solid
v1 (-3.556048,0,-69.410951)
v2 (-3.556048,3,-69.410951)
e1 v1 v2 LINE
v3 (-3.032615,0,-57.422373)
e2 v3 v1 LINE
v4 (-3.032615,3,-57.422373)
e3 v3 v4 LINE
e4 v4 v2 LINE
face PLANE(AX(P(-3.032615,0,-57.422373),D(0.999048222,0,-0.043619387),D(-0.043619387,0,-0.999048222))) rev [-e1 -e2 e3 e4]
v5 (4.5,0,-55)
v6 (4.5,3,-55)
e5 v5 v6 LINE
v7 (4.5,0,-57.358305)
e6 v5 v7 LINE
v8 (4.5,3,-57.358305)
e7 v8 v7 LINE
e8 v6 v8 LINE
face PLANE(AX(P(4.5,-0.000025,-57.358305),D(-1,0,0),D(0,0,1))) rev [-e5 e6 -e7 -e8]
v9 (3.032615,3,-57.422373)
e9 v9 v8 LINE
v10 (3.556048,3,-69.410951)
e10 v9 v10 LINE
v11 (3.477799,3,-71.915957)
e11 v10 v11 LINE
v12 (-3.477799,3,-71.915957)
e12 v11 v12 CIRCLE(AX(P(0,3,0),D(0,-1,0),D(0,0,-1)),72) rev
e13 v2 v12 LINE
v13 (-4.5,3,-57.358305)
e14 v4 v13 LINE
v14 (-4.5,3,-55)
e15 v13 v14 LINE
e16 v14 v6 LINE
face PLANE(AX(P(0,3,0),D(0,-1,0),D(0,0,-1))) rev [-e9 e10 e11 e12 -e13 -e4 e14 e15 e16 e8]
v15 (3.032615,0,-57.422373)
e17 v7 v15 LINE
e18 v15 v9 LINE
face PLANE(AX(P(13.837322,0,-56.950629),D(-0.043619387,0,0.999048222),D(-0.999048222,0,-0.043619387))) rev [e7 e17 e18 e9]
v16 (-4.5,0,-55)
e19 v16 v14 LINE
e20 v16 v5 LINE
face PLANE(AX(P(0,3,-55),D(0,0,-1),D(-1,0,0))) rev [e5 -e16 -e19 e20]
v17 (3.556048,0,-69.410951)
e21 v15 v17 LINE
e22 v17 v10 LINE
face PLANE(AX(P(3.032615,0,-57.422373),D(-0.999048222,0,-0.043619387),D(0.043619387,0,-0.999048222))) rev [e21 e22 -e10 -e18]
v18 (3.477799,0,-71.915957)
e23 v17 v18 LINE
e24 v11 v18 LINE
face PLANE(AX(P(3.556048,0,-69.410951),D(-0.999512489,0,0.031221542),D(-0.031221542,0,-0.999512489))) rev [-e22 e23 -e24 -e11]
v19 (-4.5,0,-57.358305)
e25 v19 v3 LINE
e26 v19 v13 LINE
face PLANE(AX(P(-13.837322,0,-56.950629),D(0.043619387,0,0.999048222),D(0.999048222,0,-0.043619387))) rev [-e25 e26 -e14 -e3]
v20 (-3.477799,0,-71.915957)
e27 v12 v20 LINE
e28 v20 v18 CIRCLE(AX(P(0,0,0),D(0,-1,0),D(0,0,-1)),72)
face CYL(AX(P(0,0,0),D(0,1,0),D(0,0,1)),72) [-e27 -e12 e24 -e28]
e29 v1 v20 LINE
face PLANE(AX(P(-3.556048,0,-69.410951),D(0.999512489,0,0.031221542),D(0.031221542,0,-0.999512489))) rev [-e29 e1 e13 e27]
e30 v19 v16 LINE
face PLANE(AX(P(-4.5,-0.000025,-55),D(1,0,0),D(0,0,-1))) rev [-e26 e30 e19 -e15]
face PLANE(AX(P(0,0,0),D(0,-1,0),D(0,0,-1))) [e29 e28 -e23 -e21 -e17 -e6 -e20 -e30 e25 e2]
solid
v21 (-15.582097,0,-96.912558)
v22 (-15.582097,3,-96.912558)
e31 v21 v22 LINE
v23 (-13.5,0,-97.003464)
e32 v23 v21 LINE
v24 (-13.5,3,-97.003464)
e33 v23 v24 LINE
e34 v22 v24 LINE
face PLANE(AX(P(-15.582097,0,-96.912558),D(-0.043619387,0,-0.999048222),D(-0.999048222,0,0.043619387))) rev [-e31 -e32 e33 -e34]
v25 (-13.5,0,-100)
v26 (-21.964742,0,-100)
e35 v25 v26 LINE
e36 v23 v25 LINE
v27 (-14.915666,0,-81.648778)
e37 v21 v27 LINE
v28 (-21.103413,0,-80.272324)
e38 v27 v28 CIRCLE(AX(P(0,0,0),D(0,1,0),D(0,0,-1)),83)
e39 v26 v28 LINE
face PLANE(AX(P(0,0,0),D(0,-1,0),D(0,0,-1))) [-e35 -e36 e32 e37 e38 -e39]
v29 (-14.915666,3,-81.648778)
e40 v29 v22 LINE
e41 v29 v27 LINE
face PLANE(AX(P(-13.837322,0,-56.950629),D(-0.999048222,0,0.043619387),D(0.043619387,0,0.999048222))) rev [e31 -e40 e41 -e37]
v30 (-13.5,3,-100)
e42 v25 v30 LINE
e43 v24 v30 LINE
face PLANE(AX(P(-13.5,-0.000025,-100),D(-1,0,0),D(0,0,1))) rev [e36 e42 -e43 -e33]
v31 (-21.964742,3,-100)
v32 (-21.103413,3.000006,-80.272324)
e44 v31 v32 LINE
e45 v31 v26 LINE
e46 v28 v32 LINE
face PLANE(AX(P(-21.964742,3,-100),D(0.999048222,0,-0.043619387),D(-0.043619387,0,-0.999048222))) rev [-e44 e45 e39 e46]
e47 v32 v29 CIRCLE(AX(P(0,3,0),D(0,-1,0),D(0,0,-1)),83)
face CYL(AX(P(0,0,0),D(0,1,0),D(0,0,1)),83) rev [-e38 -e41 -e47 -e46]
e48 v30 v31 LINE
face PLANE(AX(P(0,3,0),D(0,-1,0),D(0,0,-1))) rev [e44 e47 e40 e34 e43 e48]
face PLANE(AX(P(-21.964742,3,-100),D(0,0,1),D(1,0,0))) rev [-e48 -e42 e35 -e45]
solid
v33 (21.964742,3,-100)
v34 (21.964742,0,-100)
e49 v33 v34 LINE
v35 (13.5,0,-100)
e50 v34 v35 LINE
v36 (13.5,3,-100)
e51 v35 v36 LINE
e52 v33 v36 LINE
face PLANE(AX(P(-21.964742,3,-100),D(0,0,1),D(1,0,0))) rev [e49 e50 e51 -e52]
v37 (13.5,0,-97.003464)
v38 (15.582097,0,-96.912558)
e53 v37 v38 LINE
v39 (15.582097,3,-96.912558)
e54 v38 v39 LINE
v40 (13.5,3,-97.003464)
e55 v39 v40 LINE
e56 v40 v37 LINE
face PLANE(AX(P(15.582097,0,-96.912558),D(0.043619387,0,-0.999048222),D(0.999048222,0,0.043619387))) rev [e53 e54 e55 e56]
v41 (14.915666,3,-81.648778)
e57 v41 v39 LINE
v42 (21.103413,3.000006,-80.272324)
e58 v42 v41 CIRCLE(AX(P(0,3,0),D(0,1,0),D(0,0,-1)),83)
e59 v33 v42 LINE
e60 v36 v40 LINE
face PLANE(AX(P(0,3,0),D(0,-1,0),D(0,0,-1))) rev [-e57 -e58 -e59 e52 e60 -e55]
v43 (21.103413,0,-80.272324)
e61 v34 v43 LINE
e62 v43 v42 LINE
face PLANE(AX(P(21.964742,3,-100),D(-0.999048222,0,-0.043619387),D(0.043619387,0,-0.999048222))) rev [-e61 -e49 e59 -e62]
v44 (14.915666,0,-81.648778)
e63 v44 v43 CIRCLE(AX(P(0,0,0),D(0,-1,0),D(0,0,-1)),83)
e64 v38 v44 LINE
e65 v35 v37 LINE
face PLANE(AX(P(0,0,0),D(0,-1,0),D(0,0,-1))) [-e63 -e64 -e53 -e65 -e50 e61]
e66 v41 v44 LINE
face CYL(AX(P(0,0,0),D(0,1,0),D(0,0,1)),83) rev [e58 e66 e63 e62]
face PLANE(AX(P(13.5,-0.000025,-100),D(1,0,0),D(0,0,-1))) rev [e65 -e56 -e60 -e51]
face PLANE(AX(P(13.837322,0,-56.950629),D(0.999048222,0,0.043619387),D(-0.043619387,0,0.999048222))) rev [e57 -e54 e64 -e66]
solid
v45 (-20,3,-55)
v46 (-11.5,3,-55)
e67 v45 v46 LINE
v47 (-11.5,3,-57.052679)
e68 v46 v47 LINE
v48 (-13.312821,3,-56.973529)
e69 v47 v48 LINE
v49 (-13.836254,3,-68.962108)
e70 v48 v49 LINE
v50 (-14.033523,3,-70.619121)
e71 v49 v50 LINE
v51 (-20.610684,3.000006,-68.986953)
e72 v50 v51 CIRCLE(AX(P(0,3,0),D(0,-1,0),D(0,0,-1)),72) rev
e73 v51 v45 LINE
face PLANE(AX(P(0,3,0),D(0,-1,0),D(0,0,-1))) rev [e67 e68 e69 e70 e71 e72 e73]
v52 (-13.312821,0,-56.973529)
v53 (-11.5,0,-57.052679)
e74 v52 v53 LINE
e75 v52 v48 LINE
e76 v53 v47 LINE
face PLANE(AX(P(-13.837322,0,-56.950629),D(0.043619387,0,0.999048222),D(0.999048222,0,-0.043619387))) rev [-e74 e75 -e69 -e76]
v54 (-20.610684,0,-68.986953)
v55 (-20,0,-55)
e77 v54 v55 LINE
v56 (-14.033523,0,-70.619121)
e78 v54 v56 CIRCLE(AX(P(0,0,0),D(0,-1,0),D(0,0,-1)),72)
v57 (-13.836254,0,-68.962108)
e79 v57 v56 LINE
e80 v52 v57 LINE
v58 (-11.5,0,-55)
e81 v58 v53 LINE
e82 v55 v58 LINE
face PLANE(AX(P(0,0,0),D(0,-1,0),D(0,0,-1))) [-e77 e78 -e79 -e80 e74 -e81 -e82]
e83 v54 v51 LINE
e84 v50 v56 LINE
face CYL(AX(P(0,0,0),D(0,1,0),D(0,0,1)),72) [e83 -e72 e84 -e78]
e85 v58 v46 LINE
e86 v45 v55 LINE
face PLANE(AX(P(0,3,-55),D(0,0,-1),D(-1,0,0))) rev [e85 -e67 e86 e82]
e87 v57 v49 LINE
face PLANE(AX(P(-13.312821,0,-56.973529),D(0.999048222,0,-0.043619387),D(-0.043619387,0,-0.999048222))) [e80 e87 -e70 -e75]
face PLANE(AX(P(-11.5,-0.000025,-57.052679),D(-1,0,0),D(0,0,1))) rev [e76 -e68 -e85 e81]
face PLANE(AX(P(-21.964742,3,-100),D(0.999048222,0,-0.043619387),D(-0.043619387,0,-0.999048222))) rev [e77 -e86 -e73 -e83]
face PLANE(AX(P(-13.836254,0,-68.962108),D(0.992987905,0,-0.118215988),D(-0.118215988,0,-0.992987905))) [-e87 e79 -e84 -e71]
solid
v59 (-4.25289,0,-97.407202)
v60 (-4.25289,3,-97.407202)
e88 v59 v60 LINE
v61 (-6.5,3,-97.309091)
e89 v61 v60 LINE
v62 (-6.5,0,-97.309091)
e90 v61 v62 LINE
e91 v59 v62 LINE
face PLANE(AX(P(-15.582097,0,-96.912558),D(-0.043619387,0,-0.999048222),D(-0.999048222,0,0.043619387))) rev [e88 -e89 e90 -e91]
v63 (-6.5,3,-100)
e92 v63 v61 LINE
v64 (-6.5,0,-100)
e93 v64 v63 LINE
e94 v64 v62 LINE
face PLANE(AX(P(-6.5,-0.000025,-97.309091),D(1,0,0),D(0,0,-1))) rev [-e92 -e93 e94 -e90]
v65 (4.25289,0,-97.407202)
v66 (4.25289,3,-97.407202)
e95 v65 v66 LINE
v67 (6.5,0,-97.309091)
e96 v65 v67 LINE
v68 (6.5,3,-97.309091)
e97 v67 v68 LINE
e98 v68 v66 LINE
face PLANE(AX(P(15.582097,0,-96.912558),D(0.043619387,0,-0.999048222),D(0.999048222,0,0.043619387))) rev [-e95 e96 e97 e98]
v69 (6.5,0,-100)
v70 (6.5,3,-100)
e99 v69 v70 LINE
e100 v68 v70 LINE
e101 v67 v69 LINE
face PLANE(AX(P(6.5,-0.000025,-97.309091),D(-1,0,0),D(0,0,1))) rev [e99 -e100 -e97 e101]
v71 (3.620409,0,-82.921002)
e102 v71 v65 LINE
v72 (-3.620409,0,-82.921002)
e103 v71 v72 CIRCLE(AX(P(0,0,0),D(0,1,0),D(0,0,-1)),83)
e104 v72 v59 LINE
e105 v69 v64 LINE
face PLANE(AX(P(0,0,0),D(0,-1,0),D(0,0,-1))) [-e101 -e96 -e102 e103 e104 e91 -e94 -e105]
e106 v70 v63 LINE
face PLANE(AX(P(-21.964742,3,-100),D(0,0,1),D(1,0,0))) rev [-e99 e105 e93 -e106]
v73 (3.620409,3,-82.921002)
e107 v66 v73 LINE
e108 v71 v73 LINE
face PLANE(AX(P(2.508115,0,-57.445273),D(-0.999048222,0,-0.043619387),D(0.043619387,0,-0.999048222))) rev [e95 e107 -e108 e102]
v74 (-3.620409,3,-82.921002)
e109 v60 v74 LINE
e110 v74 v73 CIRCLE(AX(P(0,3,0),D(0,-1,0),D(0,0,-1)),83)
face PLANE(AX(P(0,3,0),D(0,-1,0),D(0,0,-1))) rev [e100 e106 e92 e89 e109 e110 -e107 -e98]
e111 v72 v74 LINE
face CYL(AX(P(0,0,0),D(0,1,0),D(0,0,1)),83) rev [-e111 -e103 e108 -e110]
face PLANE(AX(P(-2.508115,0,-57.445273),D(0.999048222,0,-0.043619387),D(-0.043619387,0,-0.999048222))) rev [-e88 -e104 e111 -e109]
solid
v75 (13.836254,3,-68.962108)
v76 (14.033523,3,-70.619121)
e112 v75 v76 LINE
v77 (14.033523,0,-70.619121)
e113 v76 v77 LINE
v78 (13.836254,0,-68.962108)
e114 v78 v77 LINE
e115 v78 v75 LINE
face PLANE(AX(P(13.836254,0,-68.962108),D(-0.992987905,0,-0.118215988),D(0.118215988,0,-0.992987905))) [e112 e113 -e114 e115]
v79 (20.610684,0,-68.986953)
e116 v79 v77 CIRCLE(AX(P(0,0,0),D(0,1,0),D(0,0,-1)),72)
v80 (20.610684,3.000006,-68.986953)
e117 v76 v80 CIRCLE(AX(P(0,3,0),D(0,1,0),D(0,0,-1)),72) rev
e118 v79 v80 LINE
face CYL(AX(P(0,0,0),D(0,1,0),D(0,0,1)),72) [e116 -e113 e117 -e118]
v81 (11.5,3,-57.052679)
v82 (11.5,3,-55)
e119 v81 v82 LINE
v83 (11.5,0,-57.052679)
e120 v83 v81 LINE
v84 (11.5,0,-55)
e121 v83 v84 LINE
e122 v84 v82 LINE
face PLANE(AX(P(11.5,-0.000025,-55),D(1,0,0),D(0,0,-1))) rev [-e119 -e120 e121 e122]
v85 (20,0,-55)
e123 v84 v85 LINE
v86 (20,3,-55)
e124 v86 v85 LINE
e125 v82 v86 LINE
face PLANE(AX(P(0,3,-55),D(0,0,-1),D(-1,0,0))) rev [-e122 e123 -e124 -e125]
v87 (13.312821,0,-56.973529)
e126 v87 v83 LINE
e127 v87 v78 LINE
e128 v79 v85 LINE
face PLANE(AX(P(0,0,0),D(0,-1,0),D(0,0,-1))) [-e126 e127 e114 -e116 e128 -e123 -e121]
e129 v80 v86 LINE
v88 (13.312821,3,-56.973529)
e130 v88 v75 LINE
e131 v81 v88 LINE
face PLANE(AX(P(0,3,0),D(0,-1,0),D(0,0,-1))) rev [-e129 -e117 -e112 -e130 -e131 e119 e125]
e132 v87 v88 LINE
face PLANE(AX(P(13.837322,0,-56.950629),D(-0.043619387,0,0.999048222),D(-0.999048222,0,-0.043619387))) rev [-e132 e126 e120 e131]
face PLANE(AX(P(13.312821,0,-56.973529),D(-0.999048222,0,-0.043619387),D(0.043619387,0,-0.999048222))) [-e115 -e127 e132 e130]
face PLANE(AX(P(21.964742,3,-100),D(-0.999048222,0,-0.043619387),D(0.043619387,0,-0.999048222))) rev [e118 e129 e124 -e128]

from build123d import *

# Parameters (mm, degrees)
BOSS_EXTRUDE1_DEPTH      = 3
CUT_EXTRUDE1_DEPTH       = 103.427778996
BOSS_EXTRUDE2_DEPTH      = 3
CUT_EXTRUDE5_DEPTH       = 103.427778996
MIRROR4_DEPTH            = 3
CUT_EXTRUDE7_DEPTH       = 103.427778996
CUT_EXTRUDE7_DEPTH_BACK  = 103.427778996
CUT_EXTRUDE8_DEPTH       = 103.427778996
CUT_EXTRUDE8_DEPTH_BACK  = 103.427778996
CUT_EXTRUDE9_DEPTH       = 103.427778996
CUT_EXTRUDE9_DEPTH_BACK  = 103.427778996
CUT_EXTRUDE10_DEPTH      = 103.427778996
CUT_EXTRUDE10_DEPTH_BACK = 103.427778996


# Read off the part's stored shape, not the designer's step: Mirror4
with BuildPart() as part:
    # Sketch1 → Boss-Extrude1 (new body)
    with BuildSketch(Plane(origin=(0, 0, 0), x_dir=(1, 0, 0), z_dir=(0, 1, 0))):
        Polygon((-21.964742431, 100), (-20, 55), (0, 55), (0, 100), align=None)
    extrude(amount=BOSS_EXTRUDE1_DEPTH)

    # Sketch2 → Cut-Extrude1 (cut, symmetric)
    with BuildSketch(Plane(origin=(0, 3, 0), x_dir=(1, 0, 0), z_dir=(0, 1, 0))):
        Polygon((-13.837321606, 56.950628888), (-2.508114774, 57.445272741), (-4.252890268, 97.407201604), (-15.582097101, 96.912557752), align=None)
    extrude(amount=CUT_EXTRUDE1_DEPTH, both=True, mode=Mode.SUBTRACT)

    # Sketch6 → Boss-Extrude2 (add)
    with BuildSketch(Plane(origin=(0, 3, 0), x_dir=(1, 0, 0), z_dir=(0, 1, 0))):
        Polygon((-13.837321606, 56.950628888), (-13.31282129, 56.973529067), (-13.836253938, 68.962107726), (-14.666089966, 75.932545098), align=None)
    boss_extrude2 = extrude(amount=-BOSS_EXTRUDE2_DEPTH)

    # Mirror3: Boss-Extrude2 across plane
    add(boss_extrude2.mirror(Plane(origin=(-5.664603416, 0, 0.247321926), x_dir=(0.043619387365336264, 0, 0.9990482215818577), z_dir=(0.9990482215818578, 0, -0.043619387365336264))))

    # Sketch11 → Cut-Extrude5 (cut, symmetric)
    with BuildSketch(Plane(origin=(0, 3, 0), x_dir=(1, 0, 0), z_dir=(0, 1, 0))):
        with BuildLine():
            Line((-21.103413479, 80.272323621), (-20.610683569, 68.98695328))
            ThreePointArc((-20.610683569, 68.98695328), (-10.414877912, 71.24275625), (0, 72))
            Line((0, 72), (0, 83))
            ThreePointArc((0, 83), (-10.639481647, 82.315256364), (-21.103413479, 80.272323621))
        make_face()
    extrude(amount=CUT_EXTRUDE5_DEPTH, both=True, mode=Mode.SUBTRACT)


with BuildPart() as cut_extrude5_piece_1:
    # of the separate pieces the step leaves, piece 1, a body of its own (cut_extrude5_pieces)
    add(part.part.solids().sort_by_distance((-21.964742431, 0, -100))[0])



with BuildPart() as cut_extrude5_piece_2:
    # of the separate pieces the step leaves, piece 2, a body of its own (cut_extrude5_pieces)
    add(part.part.solids().sort_by_distance((-20.610683569, 0, -68.98695328))[0])


with BuildPart() as cut_extrude5_piece_1_1:
    add(cut_extrude5_piece_1.part)

    add(cut_extrude5_piece_2.part)  # Mirror4 merges Cut-Extrude5 piece 2
    # Mirror4 outline → Mirror4 (add)
    with BuildSketch(Plane(origin=(0, 0, 0), x_dir=(1, 0, 0), z_dir=(0, 1, 0))):
        with BuildLine():
            Line((21.964742431, 100), (0, 100))
            Line((0, 100), (0, 83))
            ThreePointArc((0, 83), (1.810635458, 82.980248248), (3.620409151, 82.921002391))
            Line((3.620409151, 82.921002391), (4.252890268, 97.407201604))
            Line((4.252890268, 97.407201604), (15.582097101, 96.912557752))
            Line((15.582097101, 96.912557752), (14.915666073, 81.648777735))
            ThreePointArc((14.915666073, 81.648777735), (18.022685133, 81.019644658), (21.103413479, 80.272323621))
            Line((21.103413479, 80.272323621), (21.964742431, 100))
        make_face()
        with BuildLine():
            Line((20, 55), (20.610683569, 68.98695328))
            ThreePointArc((20.610683569, 68.98695328), (17.341316245, 69.880460437), (14.033522659, 70.619120936))
            Line((14.033522659, 70.619120936), (13.836253938, 68.962107726))
            Line((13.836253938, 68.962107726), (13.31282129, 56.973529067))
            Line((13.31282129, 56.973529067), (3.03261509, 57.422372563))
            Line((3.03261509, 57.422372563), (3.556047738, 69.410951222))
            Line((3.556047738, 69.410951222), (3.47779944, 71.915957277))
            ThreePointArc((3.47779944, 71.915957277), (1.739407379, 71.978986253), (0, 72))
            Line((0, 72), (0, 55))
            Line((0, 55), (20, 55))
        make_face()
    extrude(amount=MIRROR4_DEPTH)

    # Sketch7 → Cut-Extrude7 (cut, two sides: drawn at the far end of the back side and taken through both)
    with BuildSketch(Plane(origin=(0, 3, 0), x_dir=(1, 0, 0), z_dir=(0, 1, 0)).offset(-CUT_EXTRUDE7_DEPTH_BACK)):
        Polygon((-13.5, 100), (-13.5, 97.003464074), (-6.5, 97.309090675), (-6.5, 100), align=None)
    extrude(amount=CUT_EXTRUDE7_DEPTH + CUT_EXTRUDE7_DEPTH_BACK, mode=Mode.SUBTRACT)

    # Sketch13 → Cut-Extrude8 (cut, two sides: drawn at the far end of the back side and taken through both)
    with BuildSketch(Plane(origin=(0, 3, 0), x_dir=(1, 0, 0), z_dir=(0, 1, 0)).offset(-CUT_EXTRUDE8_DEPTH_BACK)):
        Polygon((6.5, 97.309090675), (6.5, 100), (13.5, 100), (13.5, 97.003464074), align=None)
    extrude(amount=CUT_EXTRUDE8_DEPTH + CUT_EXTRUDE8_DEPTH_BACK, mode=Mode.SUBTRACT)

    # Sketch14 → Cut-Extrude9 (cut, two sides: drawn at the far end of the back side and taken through both)
    with BuildSketch(Plane(origin=(0, 3, 0), x_dir=(1, 0, 0), z_dir=(0, 1, 0)).offset(-CUT_EXTRUDE9_DEPTH_BACK)):
        Polygon((-11.5, 57.052678553), (-11.5, 55), (-4.5, 55), (-4.5, 57.358305154), align=None)
    extrude(amount=CUT_EXTRUDE9_DEPTH + CUT_EXTRUDE9_DEPTH_BACK, mode=Mode.SUBTRACT)

    # Sketch15 → Cut-Extrude10 (cut, two sides: drawn at the far end of the back side and taken through both)
    with BuildSketch(Plane(origin=(0, 3, 0), x_dir=(1, 0, 0), z_dir=(0, 1, 0)).offset(-CUT_EXTRUDE10_DEPTH_BACK)):
        Polygon((4.5, 57.358305154), (4.5, 55), (11.5, 55), (11.5, 57.052678553), align=None)
    extrude(amount=CUT_EXTRUDE10_DEPTH + CUT_EXTRUDE10_DEPTH_BACK, mode=Mode.SUBTRACT)


solid = cut_extrude5_piece_1_1.part
